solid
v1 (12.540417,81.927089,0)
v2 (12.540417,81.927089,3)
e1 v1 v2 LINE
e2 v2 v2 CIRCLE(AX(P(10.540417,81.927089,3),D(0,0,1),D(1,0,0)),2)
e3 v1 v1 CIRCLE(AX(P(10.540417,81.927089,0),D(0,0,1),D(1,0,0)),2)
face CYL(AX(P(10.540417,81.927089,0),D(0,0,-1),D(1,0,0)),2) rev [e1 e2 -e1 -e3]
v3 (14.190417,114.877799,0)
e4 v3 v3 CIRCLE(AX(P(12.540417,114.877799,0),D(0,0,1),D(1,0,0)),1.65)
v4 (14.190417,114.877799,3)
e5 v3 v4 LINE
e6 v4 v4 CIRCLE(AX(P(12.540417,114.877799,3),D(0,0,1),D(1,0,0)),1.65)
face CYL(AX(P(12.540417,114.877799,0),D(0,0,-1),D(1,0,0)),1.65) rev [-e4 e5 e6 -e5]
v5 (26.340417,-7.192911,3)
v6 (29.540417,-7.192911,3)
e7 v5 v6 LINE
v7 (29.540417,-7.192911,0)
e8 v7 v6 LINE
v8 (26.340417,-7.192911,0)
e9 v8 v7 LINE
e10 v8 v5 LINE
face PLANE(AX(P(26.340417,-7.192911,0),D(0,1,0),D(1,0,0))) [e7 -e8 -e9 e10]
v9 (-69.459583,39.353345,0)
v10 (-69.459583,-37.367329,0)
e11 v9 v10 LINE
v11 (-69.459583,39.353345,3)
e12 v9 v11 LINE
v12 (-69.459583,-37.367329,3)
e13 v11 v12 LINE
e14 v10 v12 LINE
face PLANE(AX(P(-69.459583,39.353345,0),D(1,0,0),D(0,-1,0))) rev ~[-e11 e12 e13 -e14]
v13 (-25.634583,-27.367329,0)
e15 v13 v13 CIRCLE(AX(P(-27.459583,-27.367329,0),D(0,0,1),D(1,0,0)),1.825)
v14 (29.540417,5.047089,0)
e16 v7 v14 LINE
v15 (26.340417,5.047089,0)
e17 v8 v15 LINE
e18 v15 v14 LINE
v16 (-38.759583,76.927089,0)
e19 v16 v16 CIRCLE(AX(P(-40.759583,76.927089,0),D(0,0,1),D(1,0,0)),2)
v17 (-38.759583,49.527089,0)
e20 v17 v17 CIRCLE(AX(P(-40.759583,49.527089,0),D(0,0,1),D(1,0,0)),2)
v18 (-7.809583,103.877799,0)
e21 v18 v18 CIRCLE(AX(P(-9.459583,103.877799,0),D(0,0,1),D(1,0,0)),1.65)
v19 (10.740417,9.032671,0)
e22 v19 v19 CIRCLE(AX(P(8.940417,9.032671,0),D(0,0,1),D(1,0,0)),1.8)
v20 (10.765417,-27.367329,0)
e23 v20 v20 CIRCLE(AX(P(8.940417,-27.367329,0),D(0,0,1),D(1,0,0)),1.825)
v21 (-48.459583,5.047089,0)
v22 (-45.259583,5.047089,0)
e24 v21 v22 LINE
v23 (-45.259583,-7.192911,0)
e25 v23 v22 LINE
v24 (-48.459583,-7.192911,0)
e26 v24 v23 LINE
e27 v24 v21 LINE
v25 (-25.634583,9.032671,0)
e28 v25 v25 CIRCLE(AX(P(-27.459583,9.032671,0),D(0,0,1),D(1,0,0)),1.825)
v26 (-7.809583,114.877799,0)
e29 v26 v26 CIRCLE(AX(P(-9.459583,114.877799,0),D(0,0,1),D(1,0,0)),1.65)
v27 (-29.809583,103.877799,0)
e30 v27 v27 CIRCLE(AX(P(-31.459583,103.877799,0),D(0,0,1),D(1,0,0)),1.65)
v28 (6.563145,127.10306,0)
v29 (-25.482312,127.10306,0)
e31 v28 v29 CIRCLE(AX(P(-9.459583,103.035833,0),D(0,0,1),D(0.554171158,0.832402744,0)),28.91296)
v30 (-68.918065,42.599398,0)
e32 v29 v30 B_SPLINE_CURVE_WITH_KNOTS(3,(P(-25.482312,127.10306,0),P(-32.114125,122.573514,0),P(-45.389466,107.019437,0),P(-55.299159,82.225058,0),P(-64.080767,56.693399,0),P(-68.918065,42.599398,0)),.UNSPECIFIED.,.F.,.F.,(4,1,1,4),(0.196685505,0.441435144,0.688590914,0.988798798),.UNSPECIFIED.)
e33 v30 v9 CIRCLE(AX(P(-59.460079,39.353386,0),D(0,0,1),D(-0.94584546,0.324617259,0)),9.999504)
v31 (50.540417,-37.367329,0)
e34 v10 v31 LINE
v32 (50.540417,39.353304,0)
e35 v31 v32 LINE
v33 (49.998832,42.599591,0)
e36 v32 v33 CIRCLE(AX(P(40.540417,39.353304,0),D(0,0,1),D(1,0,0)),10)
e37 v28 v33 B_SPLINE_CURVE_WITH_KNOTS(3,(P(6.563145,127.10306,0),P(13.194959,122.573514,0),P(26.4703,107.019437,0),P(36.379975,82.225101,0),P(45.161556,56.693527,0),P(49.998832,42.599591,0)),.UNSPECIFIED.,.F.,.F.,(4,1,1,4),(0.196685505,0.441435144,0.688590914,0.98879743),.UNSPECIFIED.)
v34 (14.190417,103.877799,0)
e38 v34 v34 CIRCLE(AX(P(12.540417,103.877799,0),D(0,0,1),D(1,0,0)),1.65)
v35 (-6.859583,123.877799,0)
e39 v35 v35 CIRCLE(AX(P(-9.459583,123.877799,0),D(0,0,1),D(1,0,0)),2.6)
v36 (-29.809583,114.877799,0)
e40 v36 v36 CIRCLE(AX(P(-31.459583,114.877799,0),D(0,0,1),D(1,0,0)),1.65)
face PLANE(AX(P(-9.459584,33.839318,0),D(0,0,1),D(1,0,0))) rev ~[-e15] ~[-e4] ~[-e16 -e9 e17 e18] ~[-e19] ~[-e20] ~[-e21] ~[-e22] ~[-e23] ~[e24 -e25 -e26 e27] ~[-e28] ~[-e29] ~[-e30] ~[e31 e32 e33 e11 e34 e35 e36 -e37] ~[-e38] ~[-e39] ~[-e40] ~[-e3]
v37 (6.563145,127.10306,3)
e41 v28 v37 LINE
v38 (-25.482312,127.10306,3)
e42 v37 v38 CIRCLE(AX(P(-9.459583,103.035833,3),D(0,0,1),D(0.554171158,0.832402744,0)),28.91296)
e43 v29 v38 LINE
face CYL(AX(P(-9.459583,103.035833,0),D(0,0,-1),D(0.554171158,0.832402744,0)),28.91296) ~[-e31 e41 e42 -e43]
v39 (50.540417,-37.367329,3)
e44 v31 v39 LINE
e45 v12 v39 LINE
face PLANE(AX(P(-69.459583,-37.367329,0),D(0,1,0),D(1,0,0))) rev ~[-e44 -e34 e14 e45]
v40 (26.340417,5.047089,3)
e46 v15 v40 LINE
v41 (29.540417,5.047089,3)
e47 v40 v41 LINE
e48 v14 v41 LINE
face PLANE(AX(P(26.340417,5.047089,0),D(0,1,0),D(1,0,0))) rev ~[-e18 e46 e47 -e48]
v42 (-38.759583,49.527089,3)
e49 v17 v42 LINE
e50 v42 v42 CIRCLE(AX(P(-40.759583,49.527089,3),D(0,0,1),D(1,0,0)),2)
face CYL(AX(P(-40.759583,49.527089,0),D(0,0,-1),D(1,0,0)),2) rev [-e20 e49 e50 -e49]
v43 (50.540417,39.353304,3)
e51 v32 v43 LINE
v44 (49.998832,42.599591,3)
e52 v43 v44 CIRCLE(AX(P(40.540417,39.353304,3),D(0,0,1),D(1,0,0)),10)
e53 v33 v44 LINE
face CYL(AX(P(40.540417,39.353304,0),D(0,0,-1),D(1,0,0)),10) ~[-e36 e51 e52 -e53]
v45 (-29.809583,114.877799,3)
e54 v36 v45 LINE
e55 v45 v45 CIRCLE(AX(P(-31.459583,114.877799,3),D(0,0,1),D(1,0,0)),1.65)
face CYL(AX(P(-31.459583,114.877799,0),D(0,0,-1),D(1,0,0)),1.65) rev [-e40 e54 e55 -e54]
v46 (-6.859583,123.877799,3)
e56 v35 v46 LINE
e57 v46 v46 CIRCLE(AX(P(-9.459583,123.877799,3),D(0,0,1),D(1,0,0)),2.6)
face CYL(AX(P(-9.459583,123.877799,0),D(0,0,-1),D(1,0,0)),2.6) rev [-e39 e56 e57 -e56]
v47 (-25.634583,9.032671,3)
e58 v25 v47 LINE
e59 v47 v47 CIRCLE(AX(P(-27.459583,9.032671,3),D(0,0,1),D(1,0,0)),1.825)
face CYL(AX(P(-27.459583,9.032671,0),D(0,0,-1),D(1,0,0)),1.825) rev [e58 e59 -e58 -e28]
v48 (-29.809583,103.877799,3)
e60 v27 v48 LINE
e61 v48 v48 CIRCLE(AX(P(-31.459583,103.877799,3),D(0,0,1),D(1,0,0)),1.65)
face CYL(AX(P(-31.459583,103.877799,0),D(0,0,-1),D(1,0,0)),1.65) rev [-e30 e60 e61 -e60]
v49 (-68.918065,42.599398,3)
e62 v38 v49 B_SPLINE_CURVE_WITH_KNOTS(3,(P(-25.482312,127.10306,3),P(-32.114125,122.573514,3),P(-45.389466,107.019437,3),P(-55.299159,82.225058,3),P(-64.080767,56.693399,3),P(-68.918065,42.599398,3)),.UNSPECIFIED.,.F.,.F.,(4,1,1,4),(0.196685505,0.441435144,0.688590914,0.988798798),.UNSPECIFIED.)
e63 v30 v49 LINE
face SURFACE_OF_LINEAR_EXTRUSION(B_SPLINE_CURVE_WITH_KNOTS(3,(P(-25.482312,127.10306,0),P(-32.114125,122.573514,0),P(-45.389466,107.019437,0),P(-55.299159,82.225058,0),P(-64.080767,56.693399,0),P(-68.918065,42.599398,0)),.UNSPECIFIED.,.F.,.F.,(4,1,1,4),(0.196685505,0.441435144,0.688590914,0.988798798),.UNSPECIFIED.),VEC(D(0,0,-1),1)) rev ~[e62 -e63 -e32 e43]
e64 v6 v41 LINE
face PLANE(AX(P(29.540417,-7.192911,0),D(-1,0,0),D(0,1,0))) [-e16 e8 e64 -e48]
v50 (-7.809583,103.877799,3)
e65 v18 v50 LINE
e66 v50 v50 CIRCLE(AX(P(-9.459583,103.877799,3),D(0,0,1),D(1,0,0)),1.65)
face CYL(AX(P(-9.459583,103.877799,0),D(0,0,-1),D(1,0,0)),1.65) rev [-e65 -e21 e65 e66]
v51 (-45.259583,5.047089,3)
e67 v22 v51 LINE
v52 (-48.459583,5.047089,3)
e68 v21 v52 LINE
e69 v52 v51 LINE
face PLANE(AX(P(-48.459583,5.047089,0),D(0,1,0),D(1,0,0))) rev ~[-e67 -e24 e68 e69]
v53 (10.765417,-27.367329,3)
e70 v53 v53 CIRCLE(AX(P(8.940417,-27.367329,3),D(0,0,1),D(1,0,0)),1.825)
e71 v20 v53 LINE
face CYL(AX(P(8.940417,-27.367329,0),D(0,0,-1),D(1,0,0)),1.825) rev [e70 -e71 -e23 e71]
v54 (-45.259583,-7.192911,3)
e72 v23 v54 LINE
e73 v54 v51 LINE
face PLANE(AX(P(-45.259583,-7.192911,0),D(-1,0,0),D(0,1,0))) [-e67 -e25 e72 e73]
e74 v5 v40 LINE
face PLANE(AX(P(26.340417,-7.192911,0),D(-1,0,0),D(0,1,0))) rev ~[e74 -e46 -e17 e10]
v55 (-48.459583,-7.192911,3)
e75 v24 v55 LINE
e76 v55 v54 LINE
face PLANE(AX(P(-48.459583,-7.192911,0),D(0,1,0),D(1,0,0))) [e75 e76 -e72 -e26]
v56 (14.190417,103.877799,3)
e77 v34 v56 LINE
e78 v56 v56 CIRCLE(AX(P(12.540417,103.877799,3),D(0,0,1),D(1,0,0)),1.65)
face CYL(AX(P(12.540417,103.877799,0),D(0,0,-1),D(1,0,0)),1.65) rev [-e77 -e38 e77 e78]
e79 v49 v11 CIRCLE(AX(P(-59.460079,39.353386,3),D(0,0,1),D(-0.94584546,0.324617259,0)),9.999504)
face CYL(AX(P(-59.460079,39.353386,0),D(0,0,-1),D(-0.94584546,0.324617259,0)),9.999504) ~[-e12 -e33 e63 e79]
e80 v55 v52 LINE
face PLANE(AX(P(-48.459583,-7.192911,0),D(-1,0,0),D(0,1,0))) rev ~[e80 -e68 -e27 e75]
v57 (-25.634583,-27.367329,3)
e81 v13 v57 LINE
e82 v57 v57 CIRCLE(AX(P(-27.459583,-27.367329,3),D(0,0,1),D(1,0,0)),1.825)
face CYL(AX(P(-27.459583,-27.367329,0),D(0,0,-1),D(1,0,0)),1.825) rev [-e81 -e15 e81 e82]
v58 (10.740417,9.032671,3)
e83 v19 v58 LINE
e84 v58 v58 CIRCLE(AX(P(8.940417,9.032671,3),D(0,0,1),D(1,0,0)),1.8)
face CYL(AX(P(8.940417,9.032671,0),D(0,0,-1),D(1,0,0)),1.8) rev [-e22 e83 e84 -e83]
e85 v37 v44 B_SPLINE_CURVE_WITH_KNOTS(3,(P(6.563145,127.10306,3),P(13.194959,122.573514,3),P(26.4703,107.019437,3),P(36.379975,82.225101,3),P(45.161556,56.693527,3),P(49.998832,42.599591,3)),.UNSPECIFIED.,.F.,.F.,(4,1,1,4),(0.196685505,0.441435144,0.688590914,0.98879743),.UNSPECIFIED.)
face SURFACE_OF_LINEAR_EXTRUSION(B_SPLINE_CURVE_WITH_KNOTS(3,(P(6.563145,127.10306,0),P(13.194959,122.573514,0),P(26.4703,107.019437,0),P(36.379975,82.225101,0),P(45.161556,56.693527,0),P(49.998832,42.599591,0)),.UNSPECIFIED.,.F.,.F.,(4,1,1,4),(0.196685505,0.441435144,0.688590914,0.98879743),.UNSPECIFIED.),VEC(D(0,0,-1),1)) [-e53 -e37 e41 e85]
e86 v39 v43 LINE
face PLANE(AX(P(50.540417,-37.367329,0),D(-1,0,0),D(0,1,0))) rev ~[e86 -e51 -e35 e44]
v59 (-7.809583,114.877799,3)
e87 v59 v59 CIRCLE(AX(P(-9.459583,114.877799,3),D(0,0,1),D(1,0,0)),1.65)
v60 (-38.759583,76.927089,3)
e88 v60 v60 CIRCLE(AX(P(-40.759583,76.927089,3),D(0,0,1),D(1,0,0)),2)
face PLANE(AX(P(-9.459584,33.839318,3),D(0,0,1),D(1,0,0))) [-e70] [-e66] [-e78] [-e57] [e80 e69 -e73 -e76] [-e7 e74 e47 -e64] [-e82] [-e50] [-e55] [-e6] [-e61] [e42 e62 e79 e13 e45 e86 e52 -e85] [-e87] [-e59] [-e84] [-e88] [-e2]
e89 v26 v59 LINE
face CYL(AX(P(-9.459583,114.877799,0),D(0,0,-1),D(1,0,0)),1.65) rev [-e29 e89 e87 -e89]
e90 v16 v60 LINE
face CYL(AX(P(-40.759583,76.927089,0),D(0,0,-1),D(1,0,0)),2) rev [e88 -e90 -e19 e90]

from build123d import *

# Parameters (mm, degrees)
F0_W     = 3.2
F0_H     = 12.24
F0_R     = 1.825
F0_R_2   = 2
F0_R_3   = 1.8
F0_R_4   = 1.65
F0_R_5   = 2.6
F1_DEPTH = 3


# Not quite as in the source:
# - ends of sketch curves that miss each other by under 0.0002 mm in the source are joined


with BuildPart() as f1:
    # F0 (on Top) → F1 (new body)
    with BuildSketch(Plane.XY):
        with BuildLine():
            Line((-69.459583357, 39.3533453141), (-69.459583357, -37.3673290014))
            Line((-69.459583357, -37.3673290014), (50.540416643, -37.3673290014))
            Line((50.540416643, -37.3673290014), (50.540416643, 39.3533036827))
            ThreePointArc((50.540416643, 39.3533036827), (50.404091241, 40.9988806108), (49.9988319578, 42.5995907516))
            add(Edge.make_bspline(
                [(6.5631451309, 127.1030604839), (13.1949586637, 122.5735143927), (26.4702997739, 107.0194370927), (36.3799750231, 82.2251008364), (45.1615562759, 56.6935268147), (49.9988319578, 42.5995907516)],
                knots=[0.1966855051, 0.1966855051, 0.1966855051, 0.1966855051, 0.4414351438, 0.6885909138, 0.9887974302, 0.9887974302, 0.9887974302, 0.9887974302], degree=3))
            ThreePointArc((6.5631451309, 127.1030604839), (-9.459583357, 131.9487932431), (-25.4823118448, 127.1030604839))
            add(Edge.make_bspline(
                [(-25.4823118448, 127.1030604839), (-32.1141253777, 122.5735143927), (-45.3894664879, 107.0194370927), (-55.2991588518, 82.2250580149), (-64.0807668858, 56.6933991917), (-68.9180648017, 42.5993980747)],
                knots=[0.1966855051, 0.1966855051, 0.1966855051, 0.1966855051, 0.4414351438, 0.6885909138, 0.9887987982, 0.9887987982, 0.9887987982, 0.9887987982], degree=3))
            ThreePointArc((-68.9180648017, 42.5993980747), (-69.323277955, 40.9988023559), (-69.459583357, 39.3533453141))
        make_face()
        with Locations((-46.859583357, -1.0729111145)):
            Rectangle(F0_W, F0_H, mode=Mode.SUBTRACT)
        with Locations((-27.459583357, -27.3673290014)):
            Circle(F0_R, mode=Mode.SUBTRACT)
        with Locations((-27.459583357, 9.0326709986)):
            Circle(F0_R, mode=Mode.SUBTRACT)
        with Locations((-40.759583357, 49.5270888855)):
            Circle(F0_R_2, mode=Mode.SUBTRACT)
        with Locations((8.940416643, -27.3673290014)):
            Circle(F0_R, mode=Mode.SUBTRACT)
        with Locations((8.940416643, 9.0326709986)):
            Circle(F0_R_3, mode=Mode.SUBTRACT)
        with Locations((27.940416643, -1.0729111145)):
            Rectangle(F0_W, F0_H, mode=Mode.SUBTRACT)
        with Locations((-40.759583357, 76.9270888855)):
            Circle(F0_R_2, mode=Mode.SUBTRACT)
        with Locations((-31.459583357, 103.8777989149)):
            Circle(F0_R_4, mode=Mode.SUBTRACT)
        with Locations((-9.459583357, 103.8777989149)):
            Circle(F0_R_4, mode=Mode.SUBTRACT)
        with Locations((-31.459583357, 114.8777989149)):
            Circle(F0_R_4, mode=Mode.SUBTRACT)
        with Locations((-9.459583357, 114.8777989149)):
            Circle(F0_R_4, mode=Mode.SUBTRACT)
        with Locations((-9.459583357, 123.8777989149)):
            Circle(F0_R_5, mode=Mode.SUBTRACT)
        with Locations((10.540416643, 81.9270888855)):
            Circle(F0_R_2, mode=Mode.SUBTRACT)
        with Locations((12.540416643, 103.8777989149)):
            Circle(F0_R_4, mode=Mode.SUBTRACT)
        with Locations((12.540416643, 114.8777989149)):
            Circle(F0_R_4, mode=Mode.SUBTRACT)
    extrude(amount=F1_DEPTH)


solid = f1.part
